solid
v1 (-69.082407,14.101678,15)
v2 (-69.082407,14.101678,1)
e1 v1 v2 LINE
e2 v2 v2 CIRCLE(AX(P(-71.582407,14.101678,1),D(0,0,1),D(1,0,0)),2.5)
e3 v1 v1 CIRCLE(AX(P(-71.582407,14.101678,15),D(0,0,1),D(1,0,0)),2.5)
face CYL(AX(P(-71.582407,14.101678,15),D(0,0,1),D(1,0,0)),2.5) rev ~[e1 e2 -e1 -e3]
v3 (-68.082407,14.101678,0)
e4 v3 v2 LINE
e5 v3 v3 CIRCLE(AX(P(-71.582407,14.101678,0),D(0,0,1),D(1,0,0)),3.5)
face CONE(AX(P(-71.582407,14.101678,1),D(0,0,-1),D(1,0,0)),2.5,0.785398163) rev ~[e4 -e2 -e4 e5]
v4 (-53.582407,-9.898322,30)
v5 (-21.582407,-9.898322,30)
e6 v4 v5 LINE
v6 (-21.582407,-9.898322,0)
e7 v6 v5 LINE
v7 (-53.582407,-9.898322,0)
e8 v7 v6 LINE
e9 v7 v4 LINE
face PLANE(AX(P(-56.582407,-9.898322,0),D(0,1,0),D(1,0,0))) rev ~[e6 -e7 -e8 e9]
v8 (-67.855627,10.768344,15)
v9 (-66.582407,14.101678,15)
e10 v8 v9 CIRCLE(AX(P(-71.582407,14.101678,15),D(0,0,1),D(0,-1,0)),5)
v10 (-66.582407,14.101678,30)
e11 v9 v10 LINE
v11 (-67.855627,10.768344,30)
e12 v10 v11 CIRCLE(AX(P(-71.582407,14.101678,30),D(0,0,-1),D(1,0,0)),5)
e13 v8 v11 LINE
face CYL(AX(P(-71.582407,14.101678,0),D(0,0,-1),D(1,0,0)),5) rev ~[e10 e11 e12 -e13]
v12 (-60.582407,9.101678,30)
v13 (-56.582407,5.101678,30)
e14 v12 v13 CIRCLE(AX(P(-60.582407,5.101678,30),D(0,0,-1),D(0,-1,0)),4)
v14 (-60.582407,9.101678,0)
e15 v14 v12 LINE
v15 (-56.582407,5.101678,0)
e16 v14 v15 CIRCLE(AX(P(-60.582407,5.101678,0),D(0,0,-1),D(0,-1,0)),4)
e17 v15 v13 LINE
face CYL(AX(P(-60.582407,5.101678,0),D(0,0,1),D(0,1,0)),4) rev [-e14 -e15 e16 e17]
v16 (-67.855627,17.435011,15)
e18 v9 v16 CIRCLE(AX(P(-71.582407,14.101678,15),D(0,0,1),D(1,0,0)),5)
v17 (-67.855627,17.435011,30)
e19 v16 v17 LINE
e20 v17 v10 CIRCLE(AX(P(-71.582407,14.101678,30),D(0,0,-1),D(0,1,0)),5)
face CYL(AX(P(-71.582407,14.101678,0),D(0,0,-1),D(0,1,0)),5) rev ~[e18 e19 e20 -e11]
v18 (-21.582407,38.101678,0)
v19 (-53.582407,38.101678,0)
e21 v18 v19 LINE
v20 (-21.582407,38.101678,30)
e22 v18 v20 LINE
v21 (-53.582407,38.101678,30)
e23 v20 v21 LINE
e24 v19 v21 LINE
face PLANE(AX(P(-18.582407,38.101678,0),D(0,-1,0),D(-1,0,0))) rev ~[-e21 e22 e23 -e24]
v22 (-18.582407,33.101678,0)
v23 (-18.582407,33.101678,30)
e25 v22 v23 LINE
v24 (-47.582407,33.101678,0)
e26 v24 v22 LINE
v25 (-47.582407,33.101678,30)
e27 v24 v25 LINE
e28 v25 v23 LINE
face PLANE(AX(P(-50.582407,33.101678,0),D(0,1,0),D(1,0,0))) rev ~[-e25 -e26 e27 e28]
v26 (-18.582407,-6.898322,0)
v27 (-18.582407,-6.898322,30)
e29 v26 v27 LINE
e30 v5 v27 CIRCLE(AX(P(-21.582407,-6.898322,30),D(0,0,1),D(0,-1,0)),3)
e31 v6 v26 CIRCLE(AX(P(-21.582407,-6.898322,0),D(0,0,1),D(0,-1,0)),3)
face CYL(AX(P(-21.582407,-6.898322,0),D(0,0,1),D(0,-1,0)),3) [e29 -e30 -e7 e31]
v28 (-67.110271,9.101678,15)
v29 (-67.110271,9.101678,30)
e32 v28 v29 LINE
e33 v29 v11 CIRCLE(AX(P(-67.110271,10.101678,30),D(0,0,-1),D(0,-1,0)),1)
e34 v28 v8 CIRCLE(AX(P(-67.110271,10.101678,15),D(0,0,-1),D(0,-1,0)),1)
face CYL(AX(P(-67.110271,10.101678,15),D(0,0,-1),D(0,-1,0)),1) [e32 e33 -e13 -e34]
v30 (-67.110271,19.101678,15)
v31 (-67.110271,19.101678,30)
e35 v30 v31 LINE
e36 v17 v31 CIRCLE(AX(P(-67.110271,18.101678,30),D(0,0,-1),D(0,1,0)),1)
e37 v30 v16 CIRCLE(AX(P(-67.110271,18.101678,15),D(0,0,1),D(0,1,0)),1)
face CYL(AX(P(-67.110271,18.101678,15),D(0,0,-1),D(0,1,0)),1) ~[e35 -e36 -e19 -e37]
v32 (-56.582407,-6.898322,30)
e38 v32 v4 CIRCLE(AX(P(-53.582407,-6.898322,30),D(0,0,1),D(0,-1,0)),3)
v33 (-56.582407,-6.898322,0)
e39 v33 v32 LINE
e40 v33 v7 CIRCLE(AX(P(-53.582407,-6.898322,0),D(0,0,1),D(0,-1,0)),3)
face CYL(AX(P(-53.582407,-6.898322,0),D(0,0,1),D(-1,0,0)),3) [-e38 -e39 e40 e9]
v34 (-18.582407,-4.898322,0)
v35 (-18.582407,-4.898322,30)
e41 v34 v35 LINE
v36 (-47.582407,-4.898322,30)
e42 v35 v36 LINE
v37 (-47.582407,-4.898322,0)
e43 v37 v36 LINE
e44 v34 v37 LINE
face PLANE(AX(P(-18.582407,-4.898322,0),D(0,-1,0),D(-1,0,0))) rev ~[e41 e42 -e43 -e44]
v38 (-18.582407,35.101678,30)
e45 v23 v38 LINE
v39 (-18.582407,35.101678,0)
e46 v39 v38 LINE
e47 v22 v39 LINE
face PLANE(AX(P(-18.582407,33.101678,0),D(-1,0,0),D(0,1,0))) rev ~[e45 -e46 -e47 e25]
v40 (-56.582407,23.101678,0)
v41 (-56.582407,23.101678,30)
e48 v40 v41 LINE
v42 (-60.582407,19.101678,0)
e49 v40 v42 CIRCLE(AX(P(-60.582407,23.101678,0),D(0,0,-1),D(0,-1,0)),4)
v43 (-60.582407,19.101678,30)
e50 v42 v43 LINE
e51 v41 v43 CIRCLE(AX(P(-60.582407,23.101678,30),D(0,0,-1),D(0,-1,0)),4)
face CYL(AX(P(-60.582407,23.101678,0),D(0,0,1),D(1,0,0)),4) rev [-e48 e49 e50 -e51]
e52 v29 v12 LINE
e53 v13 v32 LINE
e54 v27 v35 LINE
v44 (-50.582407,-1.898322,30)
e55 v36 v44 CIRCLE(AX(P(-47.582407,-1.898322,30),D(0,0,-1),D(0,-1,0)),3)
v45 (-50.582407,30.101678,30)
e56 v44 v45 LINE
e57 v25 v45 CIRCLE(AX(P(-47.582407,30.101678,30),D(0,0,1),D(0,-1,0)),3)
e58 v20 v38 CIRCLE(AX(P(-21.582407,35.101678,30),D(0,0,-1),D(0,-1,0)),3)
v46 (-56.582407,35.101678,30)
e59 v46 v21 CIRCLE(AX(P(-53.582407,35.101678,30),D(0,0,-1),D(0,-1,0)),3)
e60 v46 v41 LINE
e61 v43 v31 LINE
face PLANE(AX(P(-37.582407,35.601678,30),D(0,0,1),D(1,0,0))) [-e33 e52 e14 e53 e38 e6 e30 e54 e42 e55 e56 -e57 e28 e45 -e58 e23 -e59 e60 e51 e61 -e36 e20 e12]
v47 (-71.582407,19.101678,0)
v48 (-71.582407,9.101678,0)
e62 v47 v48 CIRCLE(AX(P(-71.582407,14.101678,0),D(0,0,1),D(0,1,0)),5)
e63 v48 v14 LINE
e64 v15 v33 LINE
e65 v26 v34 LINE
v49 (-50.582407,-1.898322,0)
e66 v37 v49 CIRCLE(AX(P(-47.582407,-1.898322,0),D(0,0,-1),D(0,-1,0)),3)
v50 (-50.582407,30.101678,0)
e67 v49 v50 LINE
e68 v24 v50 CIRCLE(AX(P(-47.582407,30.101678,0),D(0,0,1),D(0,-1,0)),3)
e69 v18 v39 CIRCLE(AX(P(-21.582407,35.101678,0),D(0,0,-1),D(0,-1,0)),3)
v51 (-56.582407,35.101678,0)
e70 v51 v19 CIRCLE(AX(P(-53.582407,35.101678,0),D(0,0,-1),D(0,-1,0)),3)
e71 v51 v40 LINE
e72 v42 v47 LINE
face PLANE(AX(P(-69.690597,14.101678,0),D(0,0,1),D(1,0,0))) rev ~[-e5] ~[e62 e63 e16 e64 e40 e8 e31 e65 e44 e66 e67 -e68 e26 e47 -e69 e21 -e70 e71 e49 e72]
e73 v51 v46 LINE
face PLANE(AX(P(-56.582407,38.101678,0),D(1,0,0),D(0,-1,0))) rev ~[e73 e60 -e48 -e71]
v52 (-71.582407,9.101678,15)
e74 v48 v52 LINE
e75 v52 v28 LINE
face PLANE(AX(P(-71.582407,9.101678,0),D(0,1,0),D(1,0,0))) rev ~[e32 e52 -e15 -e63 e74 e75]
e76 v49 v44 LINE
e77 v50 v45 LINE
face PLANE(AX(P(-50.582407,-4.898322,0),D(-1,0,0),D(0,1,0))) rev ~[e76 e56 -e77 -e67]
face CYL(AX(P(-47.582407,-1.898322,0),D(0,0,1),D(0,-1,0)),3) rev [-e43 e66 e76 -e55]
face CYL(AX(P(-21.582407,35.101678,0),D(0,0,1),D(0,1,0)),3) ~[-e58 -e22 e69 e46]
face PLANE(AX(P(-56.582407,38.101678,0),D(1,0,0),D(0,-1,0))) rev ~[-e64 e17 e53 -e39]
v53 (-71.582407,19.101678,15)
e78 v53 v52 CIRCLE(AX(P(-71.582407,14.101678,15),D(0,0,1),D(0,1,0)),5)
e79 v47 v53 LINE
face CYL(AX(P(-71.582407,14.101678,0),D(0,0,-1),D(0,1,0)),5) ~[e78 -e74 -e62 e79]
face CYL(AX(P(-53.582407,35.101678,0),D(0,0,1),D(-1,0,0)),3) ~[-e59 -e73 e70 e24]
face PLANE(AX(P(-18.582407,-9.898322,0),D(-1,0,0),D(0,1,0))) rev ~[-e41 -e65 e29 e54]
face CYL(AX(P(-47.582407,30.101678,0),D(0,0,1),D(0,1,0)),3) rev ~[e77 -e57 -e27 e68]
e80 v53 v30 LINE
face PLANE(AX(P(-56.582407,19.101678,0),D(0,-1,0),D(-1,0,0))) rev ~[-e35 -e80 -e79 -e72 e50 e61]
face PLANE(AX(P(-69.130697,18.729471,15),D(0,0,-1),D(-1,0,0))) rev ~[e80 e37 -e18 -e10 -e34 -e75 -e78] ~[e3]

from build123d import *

# Parameters (mm, degrees)
F1_DEPTH    = 30
F2_DEPTH    = 30
F3_DEPTH    = 15
F4_R        = 2.5
F5_DEPTH    = 25
F6_R        = 3
F7_R        = 4
F8_T1_DEPTH = 26.1803398875
F9_SIZE     = 1


# Not quite as in the source:
# - a fillet or chamfer that OpenCascade refuses, or shapes differently, is made with other operations: its cross-section is extruded or revolved along the edge and cut away or added


with BuildPart() as f1:
    # F0 (on Top) → F1 (new body)
    with BuildSketch(Plane.XY):
        with BuildLine():
            ThreePointArc((-71.5824067593, 19.101677686), (-68.0468728533, 17.6372115919), (-66.5824067593, 14.101677686))
            ThreePointArc((-66.5824067593, 14.101677686), (-68.0468728533, 10.56614378), (-71.5824067593, 9.101677686))
            Line((-71.5824067593, 9.101677686), (-56.5824067593, 9.101677686))
            Line((-56.5824067593, 9.101677686), (-56.5824067593, 19.101677686))
            Line((-56.5824067593, 19.101677686), (-71.5824067593, 19.101677686))
        make_face()
    extrude(amount=F1_DEPTH)

    # F0 (on Top) → F2 (join)
    with BuildSketch(Plane.XY):
        Polygon((-56.5824067593, 38.101677686), (-56.5824067593, 33.101677686), (-50.5824067593, 33.101677686), (-18.5824067593, 33.101677686), (-18.5824067593, 38.101677686), align=None)
        Polygon((-56.5824067593, 33.101677686), (-56.5824067593, 19.101677686), (-56.5824067593, 9.101677686), (-56.5824067593, -4.898322314), (-50.5824067593, -4.898322314), (-50.5824067593, 33.101677686), align=None)
        Polygon((-50.5824067593, -4.898322314), (-56.5824067593, -4.898322314), (-56.5824067593, -9.898322314), (-18.5824067593, -9.898322314), (-18.5824067593, -4.898322314), align=None)
    extrude(amount=F2_DEPTH)

    # F0 (on Top) → F3 (join)
    with BuildSketch(Plane.XY):
        with BuildLine():
            ThreePointArc((-71.5824067593, 9.101677686), (-68.0468728533, 10.56614378), (-66.5824067593, 14.101677686))
            ThreePointArc((-66.5824067593, 14.101677686), (-68.0468728533, 17.6372115919), (-71.5824067593, 19.101677686))
            Line((-71.5824067593, 19.101677686), (-71.5824067593, 9.101677686))
        make_face()
        with BuildLine():
            Line((-71.5824067593, 9.101677686), (-71.5824067593, 19.101677686))
            ThreePointArc((-71.5824067593, 19.101677686), (-76.5824067593, 14.101677686), (-71.5824067593, 9.101677686))
        make_face()
    extrude(amount=F3_DEPTH)

    # F4 (on face) → F5 (cut)
    with BuildSketch(Plane.XY.offset(15)):
        with Locations((-71.5824067593, 14.101677686)):
            Circle(F4_R)
    extrude(amount=-F5_DEPTH, mode=Mode.SUBTRACT)

    # F6
    f6_edges = [f1.edges().sort_by_distance(p)[0] for p in [
        (-18.582407, -9.898322, 15),
        (-18.582407, 38.101678, 15),
        (-50.582407, 33.101678, 15),
        (-50.582407, -4.898322, 15),
        (-56.582407, -9.898322, 15),
        (-56.582407, 38.101678, 15),
    ]]
    fillet(f6_edges, radius=F6_R)

    # F7
    f7_edges = [f1.edges().sort_by_distance(p)[0] for p in [
        (-56.582407, 9.101678, 15),
        (-56.582407, 19.101678, 15),
    ]]
    fillet(f7_edges, radius=F7_R)

    # F8: fillet of radius 1 on 4 edges, made by hand

    # F8_s2 → F8_t1 (cut)
    with BuildSketch(Plane.XY.offset(15)):
        with BuildLine():
            ThreePointArc((-67.1102708043, 19.101677686), (-68.0231417334, 18.5099259764), (-67.8556267968, 17.4350110193))
            ThreePointArc((-67.8556267968, 17.4350110193), (-69.5411653069, 18.6660323319), (-71.5824067593, 19.101677686))
            Line((-71.5824067593, 19.101677686), (-67.1102708043, 19.101677686))
        make_face()
        with BuildLine():
            ThreePointArc((-67.1102708043, 9.101677686), (-68.0231417334, 9.6934293955), (-67.8556267968, 10.7683443526))
            ThreePointArc((-67.8556267968, 10.7683443526), (-69.5411653069, 9.5373230401), (-71.5824067593, 9.101677686))
            Line((-71.5824067593, 9.101677686), (-67.1102708043, 9.101677686))
        make_face()
    extrude(amount=F8_T1_DEPTH, mode=Mode.SUBTRACT)

    # F9
    f9_edges = [f1.edges().sort_by_distance(p)[0] for p in [
        (-74.082407, 14.101678, 0),
    ]]
    chamfer(f9_edges, length=F9_SIZE)


solid = f1.part
